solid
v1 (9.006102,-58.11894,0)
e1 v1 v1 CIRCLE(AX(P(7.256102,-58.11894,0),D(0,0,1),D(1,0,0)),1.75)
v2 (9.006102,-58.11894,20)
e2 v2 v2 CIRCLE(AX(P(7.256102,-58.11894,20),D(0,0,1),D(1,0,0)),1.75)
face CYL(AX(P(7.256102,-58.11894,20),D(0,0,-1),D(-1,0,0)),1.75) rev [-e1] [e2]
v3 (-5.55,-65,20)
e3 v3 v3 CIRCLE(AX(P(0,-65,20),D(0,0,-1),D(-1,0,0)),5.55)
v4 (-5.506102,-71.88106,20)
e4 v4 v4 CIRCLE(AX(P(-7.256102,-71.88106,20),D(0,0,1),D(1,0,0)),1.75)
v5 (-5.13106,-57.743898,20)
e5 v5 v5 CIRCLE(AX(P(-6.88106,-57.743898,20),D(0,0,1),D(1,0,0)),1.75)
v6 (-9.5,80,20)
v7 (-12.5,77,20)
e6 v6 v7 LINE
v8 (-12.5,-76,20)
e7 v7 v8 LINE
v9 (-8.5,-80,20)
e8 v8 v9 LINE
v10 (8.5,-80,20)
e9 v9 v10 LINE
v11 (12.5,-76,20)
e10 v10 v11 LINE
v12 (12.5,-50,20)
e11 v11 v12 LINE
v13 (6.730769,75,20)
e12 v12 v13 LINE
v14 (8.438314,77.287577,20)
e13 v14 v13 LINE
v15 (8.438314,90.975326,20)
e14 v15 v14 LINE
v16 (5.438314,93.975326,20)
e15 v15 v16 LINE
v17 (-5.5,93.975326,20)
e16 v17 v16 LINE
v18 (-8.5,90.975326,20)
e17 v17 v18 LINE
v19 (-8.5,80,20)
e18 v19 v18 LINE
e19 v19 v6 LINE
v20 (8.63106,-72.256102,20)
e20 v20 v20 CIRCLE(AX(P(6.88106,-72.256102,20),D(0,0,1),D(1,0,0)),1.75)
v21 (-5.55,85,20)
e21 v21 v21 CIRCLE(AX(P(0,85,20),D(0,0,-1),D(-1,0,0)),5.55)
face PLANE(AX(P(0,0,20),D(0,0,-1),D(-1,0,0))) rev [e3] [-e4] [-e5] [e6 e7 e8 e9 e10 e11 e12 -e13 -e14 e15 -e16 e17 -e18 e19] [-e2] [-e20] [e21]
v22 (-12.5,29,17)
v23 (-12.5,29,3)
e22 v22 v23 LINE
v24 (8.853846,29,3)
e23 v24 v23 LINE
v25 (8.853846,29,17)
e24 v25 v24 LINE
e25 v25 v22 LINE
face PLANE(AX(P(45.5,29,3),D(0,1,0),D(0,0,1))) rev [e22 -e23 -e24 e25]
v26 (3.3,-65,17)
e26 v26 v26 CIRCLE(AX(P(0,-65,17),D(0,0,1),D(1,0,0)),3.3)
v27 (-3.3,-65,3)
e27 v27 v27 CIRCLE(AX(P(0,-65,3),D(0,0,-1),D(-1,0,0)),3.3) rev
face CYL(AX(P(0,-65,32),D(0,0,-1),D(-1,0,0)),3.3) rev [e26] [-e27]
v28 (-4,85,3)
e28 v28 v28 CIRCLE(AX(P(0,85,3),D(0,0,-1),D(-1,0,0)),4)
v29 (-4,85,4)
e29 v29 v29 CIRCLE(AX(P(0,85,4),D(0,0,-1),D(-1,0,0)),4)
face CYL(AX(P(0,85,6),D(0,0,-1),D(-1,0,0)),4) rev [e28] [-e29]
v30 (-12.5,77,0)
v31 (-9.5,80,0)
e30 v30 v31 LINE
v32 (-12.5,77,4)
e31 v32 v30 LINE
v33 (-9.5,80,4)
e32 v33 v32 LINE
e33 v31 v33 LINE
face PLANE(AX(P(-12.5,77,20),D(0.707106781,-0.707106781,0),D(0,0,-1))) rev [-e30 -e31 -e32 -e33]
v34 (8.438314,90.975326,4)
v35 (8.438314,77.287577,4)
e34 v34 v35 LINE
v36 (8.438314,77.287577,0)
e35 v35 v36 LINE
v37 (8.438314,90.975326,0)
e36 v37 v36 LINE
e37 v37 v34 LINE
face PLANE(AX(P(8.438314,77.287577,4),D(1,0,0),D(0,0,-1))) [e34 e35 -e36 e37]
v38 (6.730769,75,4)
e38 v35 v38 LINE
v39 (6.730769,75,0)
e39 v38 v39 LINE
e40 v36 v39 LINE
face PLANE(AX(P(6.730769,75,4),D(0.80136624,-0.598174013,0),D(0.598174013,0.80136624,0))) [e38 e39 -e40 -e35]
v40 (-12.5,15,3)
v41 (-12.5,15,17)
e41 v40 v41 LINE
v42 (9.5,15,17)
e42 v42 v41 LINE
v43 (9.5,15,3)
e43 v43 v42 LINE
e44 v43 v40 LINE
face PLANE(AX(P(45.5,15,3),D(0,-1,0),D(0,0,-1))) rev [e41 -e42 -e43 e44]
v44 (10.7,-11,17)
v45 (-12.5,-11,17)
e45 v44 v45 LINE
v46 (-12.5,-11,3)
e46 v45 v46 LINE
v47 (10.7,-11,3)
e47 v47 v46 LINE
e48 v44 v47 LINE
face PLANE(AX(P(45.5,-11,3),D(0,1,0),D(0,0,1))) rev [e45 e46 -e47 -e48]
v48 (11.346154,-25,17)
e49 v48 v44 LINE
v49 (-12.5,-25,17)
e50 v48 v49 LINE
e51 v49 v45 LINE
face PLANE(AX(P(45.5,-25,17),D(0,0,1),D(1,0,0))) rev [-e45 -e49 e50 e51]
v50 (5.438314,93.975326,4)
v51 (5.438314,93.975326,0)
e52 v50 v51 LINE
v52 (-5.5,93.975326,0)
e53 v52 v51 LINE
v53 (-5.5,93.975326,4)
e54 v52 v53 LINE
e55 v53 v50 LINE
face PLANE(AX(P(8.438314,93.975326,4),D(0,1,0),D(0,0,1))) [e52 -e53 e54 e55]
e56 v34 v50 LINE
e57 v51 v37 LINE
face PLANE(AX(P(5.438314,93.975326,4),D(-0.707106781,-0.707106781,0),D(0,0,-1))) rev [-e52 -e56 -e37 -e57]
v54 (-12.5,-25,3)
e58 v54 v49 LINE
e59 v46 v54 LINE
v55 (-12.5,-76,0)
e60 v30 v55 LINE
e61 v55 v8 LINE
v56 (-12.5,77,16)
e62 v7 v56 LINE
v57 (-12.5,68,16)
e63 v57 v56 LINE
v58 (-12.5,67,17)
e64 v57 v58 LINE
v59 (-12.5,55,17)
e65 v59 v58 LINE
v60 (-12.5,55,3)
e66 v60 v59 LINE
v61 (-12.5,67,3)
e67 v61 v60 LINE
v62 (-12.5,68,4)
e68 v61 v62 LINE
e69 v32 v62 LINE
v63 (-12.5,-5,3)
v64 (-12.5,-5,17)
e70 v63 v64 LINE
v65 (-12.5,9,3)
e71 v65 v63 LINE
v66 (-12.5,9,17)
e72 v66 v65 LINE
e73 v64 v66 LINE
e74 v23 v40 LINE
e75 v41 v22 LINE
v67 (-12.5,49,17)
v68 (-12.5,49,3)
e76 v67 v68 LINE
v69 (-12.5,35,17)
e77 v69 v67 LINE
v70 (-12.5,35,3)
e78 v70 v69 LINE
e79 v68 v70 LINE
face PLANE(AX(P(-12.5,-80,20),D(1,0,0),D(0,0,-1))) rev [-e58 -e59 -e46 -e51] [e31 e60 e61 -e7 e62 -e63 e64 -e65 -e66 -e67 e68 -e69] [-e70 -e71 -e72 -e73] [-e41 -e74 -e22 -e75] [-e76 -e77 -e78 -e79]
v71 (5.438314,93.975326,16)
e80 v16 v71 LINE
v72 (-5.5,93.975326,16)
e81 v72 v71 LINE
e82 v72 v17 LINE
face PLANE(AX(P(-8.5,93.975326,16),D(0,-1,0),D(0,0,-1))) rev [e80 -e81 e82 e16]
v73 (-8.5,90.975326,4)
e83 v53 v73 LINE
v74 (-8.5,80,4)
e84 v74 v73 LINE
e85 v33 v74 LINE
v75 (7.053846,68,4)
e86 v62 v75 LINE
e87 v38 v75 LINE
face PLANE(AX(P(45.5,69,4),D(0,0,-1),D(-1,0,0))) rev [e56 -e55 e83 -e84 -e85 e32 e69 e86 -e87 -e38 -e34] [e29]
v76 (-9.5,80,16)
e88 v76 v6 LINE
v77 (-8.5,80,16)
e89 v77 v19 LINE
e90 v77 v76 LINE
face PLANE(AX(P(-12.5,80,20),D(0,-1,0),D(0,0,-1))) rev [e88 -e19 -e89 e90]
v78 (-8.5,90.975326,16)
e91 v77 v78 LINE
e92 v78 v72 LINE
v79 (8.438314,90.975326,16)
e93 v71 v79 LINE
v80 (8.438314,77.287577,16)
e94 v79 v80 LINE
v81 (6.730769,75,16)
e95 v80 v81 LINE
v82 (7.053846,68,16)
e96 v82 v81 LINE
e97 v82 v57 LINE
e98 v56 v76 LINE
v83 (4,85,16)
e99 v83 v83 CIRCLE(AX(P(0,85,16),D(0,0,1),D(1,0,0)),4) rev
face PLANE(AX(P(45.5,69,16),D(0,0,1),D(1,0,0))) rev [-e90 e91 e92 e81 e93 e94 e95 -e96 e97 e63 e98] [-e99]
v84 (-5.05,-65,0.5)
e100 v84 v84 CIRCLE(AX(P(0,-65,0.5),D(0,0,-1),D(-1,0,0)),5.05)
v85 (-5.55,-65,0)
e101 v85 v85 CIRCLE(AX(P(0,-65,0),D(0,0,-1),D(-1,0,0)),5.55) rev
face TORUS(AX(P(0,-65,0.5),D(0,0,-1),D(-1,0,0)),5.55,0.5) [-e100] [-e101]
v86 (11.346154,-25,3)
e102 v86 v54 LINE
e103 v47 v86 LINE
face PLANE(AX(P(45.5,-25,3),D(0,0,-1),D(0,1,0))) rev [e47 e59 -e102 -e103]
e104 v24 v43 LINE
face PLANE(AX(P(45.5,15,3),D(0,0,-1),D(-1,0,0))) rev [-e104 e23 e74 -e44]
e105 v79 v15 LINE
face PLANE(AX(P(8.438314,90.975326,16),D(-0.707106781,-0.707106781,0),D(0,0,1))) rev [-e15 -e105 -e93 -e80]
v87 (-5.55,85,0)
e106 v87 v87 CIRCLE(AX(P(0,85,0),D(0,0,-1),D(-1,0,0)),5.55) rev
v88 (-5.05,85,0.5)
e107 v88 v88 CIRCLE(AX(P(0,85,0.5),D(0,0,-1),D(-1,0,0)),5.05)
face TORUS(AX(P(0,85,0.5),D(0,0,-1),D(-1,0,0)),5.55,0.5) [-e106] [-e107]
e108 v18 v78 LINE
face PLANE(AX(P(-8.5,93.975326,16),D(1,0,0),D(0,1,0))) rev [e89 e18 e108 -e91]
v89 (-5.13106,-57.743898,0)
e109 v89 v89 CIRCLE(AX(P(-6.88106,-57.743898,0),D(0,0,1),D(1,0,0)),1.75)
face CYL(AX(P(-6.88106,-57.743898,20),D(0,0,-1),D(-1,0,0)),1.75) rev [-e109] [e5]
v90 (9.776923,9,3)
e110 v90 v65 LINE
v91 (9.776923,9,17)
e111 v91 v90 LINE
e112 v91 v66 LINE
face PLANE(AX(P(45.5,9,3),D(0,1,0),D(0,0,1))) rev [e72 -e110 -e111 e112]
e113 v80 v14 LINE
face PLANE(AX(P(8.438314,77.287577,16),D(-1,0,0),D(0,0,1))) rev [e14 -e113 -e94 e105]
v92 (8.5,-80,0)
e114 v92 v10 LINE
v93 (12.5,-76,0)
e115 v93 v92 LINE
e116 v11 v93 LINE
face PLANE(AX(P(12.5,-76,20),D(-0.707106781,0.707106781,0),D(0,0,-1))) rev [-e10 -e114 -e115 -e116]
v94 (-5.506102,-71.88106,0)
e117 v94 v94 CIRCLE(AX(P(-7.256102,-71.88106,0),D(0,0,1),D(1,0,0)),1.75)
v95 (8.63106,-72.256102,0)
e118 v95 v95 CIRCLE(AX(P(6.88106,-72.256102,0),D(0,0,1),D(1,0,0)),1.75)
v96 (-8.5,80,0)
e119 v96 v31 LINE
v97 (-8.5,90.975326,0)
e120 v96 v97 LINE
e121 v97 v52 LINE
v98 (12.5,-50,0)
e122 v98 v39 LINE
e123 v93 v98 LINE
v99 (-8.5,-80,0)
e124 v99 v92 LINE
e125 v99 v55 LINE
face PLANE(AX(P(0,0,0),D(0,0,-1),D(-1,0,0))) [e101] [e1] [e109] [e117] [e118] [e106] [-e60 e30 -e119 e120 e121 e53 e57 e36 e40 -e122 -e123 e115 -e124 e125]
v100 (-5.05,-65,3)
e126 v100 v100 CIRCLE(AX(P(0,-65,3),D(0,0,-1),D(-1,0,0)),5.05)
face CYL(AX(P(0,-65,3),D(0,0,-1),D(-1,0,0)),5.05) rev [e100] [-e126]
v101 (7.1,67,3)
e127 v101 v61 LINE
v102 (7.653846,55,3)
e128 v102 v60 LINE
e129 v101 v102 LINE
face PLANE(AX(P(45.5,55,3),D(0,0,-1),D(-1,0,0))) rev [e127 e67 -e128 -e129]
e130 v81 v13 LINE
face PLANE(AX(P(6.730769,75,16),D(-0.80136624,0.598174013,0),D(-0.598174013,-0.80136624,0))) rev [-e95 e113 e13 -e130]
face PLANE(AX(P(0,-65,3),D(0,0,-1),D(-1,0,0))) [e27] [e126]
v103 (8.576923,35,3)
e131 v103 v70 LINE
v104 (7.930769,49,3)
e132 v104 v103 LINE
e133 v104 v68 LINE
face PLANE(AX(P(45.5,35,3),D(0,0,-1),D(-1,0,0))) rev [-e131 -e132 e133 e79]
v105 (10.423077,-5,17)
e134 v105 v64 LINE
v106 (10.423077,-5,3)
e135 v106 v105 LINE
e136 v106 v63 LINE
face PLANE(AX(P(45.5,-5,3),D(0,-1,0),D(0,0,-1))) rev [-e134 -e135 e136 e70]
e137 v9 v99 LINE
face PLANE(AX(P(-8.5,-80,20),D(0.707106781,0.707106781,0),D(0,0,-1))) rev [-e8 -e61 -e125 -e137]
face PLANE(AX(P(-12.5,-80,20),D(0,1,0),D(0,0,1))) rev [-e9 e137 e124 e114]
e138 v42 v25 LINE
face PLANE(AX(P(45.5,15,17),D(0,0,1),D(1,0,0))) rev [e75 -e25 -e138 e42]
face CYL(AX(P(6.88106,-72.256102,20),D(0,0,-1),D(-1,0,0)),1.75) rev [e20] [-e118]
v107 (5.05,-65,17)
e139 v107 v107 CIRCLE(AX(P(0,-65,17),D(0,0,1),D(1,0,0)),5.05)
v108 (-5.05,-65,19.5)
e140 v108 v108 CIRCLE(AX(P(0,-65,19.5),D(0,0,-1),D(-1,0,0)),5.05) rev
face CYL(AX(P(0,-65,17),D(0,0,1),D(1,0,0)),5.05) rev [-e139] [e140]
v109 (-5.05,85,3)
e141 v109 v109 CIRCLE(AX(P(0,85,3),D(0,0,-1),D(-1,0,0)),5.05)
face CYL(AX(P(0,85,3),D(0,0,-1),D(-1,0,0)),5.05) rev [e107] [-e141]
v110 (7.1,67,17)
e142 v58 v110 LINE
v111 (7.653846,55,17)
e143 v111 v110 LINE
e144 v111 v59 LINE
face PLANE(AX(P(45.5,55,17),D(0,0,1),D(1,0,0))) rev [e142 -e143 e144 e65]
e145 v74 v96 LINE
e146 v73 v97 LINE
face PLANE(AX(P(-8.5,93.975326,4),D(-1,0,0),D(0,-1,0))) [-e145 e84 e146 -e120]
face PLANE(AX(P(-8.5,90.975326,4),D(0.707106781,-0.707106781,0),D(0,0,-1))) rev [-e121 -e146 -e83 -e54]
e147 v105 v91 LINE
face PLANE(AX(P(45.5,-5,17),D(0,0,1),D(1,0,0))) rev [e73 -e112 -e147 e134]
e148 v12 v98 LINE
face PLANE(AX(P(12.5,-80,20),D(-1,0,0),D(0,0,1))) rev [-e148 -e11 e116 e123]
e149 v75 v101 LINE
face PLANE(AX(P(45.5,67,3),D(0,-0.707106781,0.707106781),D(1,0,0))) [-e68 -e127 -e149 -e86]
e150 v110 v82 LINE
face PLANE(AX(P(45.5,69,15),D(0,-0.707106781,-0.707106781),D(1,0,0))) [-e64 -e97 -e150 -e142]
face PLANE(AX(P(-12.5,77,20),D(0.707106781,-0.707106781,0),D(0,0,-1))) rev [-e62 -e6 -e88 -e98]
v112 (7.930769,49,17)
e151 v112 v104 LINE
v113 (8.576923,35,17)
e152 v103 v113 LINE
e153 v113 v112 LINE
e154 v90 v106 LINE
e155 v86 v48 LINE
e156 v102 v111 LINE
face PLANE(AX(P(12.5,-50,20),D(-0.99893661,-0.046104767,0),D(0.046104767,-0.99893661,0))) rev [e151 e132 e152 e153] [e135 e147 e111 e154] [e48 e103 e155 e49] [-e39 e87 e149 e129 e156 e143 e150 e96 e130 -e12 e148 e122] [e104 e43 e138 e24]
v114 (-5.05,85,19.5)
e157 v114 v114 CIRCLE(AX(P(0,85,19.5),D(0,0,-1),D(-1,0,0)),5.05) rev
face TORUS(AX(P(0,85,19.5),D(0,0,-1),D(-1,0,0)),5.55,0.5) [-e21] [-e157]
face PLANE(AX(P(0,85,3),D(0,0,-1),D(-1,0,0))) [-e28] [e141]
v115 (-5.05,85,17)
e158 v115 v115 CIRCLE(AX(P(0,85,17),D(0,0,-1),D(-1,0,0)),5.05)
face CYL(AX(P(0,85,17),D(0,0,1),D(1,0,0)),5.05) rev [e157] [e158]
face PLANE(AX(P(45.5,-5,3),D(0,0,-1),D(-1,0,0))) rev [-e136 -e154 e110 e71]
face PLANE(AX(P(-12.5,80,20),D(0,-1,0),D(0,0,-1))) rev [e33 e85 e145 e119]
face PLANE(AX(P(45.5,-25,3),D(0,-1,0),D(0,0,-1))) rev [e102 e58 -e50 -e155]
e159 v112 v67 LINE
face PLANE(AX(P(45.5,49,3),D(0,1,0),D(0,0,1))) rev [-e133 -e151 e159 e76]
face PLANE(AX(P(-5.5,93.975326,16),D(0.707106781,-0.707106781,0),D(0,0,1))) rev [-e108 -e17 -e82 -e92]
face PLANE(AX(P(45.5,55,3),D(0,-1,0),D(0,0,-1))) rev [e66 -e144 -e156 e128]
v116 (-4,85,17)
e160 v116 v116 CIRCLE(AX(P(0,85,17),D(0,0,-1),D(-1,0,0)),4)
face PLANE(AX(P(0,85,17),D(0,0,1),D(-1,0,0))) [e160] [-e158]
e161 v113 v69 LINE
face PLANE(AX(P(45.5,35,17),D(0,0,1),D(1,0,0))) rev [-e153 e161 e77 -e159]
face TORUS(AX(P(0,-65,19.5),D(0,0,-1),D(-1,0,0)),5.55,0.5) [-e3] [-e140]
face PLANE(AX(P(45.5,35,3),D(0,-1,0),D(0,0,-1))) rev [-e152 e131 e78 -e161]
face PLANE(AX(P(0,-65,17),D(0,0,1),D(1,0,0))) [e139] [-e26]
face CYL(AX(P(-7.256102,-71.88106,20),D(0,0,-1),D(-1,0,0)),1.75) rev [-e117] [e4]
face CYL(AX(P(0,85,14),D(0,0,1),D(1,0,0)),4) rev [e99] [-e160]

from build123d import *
from OCP.BRepFilletAPI import BRepFilletAPI_MakeChamfer

# Parameters (mm, degrees)
SKETCH_1_R          = 1.75
EXTRUDE_1_DEPTH     = 20
CHAMFER_1_SIZE      = 4
SKETCH_2_R          = 5.05
CUT_EXTRUDE_1_DEPTH = 3
SKETCH_3_R          = 3.3
CUT_EXTRUDE_2_DEPTH = 32
CUT_EXTRUDE_START   = -3
SKETCH_4_R          = 5.05
CUT_EXTRUDE_3_DEPTH = 3
CHAMFER_2_SIZE      = 3
CHAMFER_2_SIZE2     = 3.148509384
SKETCH_6_W          = 14
SKETCH_6_H          = 14
CUT_EXTRUDE_4_DEPTH = 58
EXTRUDE_2_DEPTH     = 4
SKETCH_8_R          = 5.05
CUT_EXTRUDE_5_DEPTH = 3
SKETCH_9_R          = 4
CUT_EXTRUDE_6_DEPTH = 3
CHAMFER_3_SIZE      = 3
CHAMFER_4_SIZE      = 3
CHAMFER_5_SIZE      = 2
FILLET_1_R          = 0.5
FILLET_2_R          = 0.5
FILLET_3_R          = 0.5


with BuildPart() as part:
    # 草图1 → 凸台-拉伸1 (new body)
    with BuildSketch(Plane.XY):
        Polygon((12.5, -50), (6.5, 80), (-12.5, 80), (-12.5, -80), (12.5, -80), align=None)
        with Locations((-6.881060168, -57.743898363)):
            Circle(SKETCH_1_R, mode=Mode.SUBTRACT)
        with Locations((7.256101637, -58.118939832)):
            Circle(SKETCH_1_R, mode=Mode.SUBTRACT)
        with Locations((6.881060168, -72.256101637)):
            Circle(SKETCH_1_R, mode=Mode.SUBTRACT)
        with Locations((-7.256101637, -71.881060168)):
            Circle(SKETCH_1_R, mode=Mode.SUBTRACT)
    extrude(amount=EXTRUDE_1_DEPTH)

    # 倒角1
    chamfer_1_edges = [part.edges().sort_by_distance(p)[0] for p in [
        (12.5, -80, 10),
        (-12.5, -80, 10),
    ]]
    chamfer(chamfer_1_edges, length=CHAMFER_1_SIZE)

    # 草图2 → 切除-拉伸1 (cut)
    with BuildSketch(Plane.XY.offset(20)):
        with Locations((0, -65)):
            Circle(SKETCH_2_R)
    extrude(amount=-CUT_EXTRUDE_1_DEPTH, mode=Mode.SUBTRACT)

    # 草图3 → 切除-拉伸2 (cut)
    with BuildSketch(Plane(origin=(0, 0, 0), x_dir=(-1, 0, 0), z_dir=(0, 0, -1))):
        with Locations((0, -65)):
            Circle(SKETCH_3_R)
    extrude(amount=-CUT_EXTRUDE_2_DEPTH, mode=Mode.SUBTRACT)

    # 草图4 → 切除-拉伸3 (cut)
    with BuildSketch(Plane(origin=(0, 0, 0), x_dir=(-1, 0, 0), z_dir=(0, 0, -1)).offset(CUT_EXTRUDE_START)):
        with Locations(Location((0, -65, 0), (0, 0, 180))):
            Circle(SKETCH_4_R)
    extrude(amount=CUT_EXTRUDE_3_DEPTH, mode=Mode.SUBTRACT)

    # 倒角2: one chamfer whose edges measure the first distance from different faces: ONE call of the kernel's chamfer builder (chamfer() names one face for all edges)
    chamfer_2_edges_1 = [part.edges().sort_by_distance(p)[0] for p in [
        (-12.5, 80, 10),
    ]]
    chamfer_2_edges_2 = [part.edges().sort_by_distance(p)[0] for p in [
        (6.5, 80, 10),
    ]]
    chamfer_2_side_2 = [part.faces().sort_by_distance(p)[0] for p in [
        (9.5, 15, 10),
    ]]
    chamfer_2 = BRepFilletAPI_MakeChamfer(part.part.solid().wrapped)
    for e in chamfer_2_edges_1:
        chamfer_2.Add(CHAMFER_2_SIZE, e.wrapped)
    for e in chamfer_2_edges_2:
        chamfer_2.Add(CHAMFER_2_SIZE, CHAMFER_2_SIZE2, e.wrapped, chamfer_2_side_2[0].wrapped)  # the first distance lies on this face
    add(Compound.cast(chamfer_2.Shape()), mode=Mode.REPLACE)

    # 草图6 → 切除-拉伸4 (cut)
    with BuildSketch(Plane.ZY.offset(12.5)):
        Polygon((3, 69), (4, 69), (4, 86.606833076), (16, 86.606833076), (16, 69), (17, 69), (17, 55), (3, 55), align=None)
        with Locations((10, 42)):
            Rectangle(SKETCH_6_W, SKETCH_6_H)
        with Locations((10, 22)):
            Rectangle(SKETCH_6_W, SKETCH_6_H)
        with Locations((10, 2)):
            Rectangle(SKETCH_6_W, SKETCH_6_H)
        with Locations((10, -18)):
            Rectangle(SKETCH_6_W, SKETCH_6_H)
    extrude(amount=-CUT_EXTRUDE_4_DEPTH, mode=Mode.SUBTRACT)

    # 草图7 → 凸台-拉伸2 (add)
    with BuildSketch(Plane(origin=(0, 0, 0), x_dir=(-1, 0, 0), z_dir=(0, 0, -1))):
        Polygon((8.5, 93.975326294), (-4.475326294, 93.975326294), (-6.6383143, 93.975326294), (-8.4383143, 93.975326294), (-8.4383143, 77.287576761), (-6.730769231, 75), (-6.6383143, 77.00319017), (-4.475326294, 78.975326294), (-3.351490616, 80), (8.5, 80), align=None)
    extrude_2 = extrude(amount=-EXTRUDE_2_DEPTH)

    # 镜向1: 凸台-拉伸2 across plane
    add(extrude_2.mirror(Plane.XY.offset(10)))

    # 草图8 → 切除-拉伸5 (cut)
    with BuildSketch(Plane(origin=(0, 0, 0), x_dir=(-1, 0, 0), z_dir=(0, 0, -1))):
        with Locations((0, 85)):
            Circle(SKETCH_8_R)
    cut_extrude_5 = extrude(amount=-CUT_EXTRUDE_5_DEPTH, mode=Mode.SUBTRACT)

    # 草图9 → 切除-拉伸6 (cut)
    with BuildSketch(Plane(origin=(0, 0, 3), x_dir=(-1, 0, 0), z_dir=(0, 0, -1))):
        with Locations((0, 85)):
            Circle(SKETCH_9_R)
    cut_extrude_6 = extrude(amount=-CUT_EXTRUDE_6_DEPTH, mode=Mode.SUBTRACT)

    # 镜向2: 切除-拉伸5, 切除-拉伸6 across plane
    add(cut_extrude_5.mirror(Plane.XY.offset(10)), mode=Mode.SUBTRACT)
    add(cut_extrude_6.mirror(Plane.XY.offset(10)), mode=Mode.SUBTRACT)

    # 倒角3
    chamfer_3_edges = [part.edges().sort_by_distance(p)[0] for p in [
        (8.4383143, 93.975326294, 2),
        (-8.5, 93.975326294, 2),
    ]]
    chamfer(chamfer_3_edges, length=CHAMFER_3_SIZE)

    # 倒角4
    chamfer_4_edges = [part.edges().sort_by_distance(p)[0] for p in [
        (-8.5, 93.975326294, 18),
        (8.4383143, 93.975326294, 18),
    ]]
    chamfer(chamfer_4_edges, length=CHAMFER_4_SIZE)

    # 倒角5
    # the kernel refuses this chamfer: 2 mm, written as the material it adds along each edge
    with BuildSketch(Plane(origin=(-12.5, 69, 3), x_dir=(0, -0.9996219169112968, -0.0274958766105862), z_dir=(1, 0, 0))) as chamfer_5_piece_1_section:
        Polygon((CHAMFER_5_SIZE * 0.999621916911, -CHAMFER_5_SIZE * 0.0274958766106), (-CHAMFER_5_SIZE * 0.0274958766106, -CHAMFER_5_SIZE * 0.999621916911), (0, 0), align=None)
    chamfer_5_piece_1 = extrude(amount=24.651058284, mode=Mode.PRIVATE)
    chamfer_5_piece_1 = split(chamfer_5_piece_1, bisect_by=Plane(origin=(7.023262374, 68.662648572, 3.416350106), z_dir=(-0.9989366098486855, -0.04610476660840088, 0)), keep=Keep.TOP, mode=Mode.PRIVATE)
    chamfer_5_piece_1 = split(chamfer_5_piece_1, bisect_by=Plane(origin=(-2.727982872, 68.212591099, 4), z_dir=(0, 0, -1)), keep=Keep.TOP, mode=Mode.PRIVATE)
    add(chamfer_5_piece_1)
    with BuildSketch(Plane(origin=(-12.5, 69, 17), x_dir=(0, 0.02749587661058907, -0.9996219169112965), z_dir=(1, 0, 0))) as chamfer_5_piece_2_section:
        Polygon((CHAMFER_5_SIZE * 0.999621916911, -CHAMFER_5_SIZE * 0.0274958766106), (-CHAMFER_5_SIZE * 0.0274958766106, -CHAMFER_5_SIZE * 0.999621916911), (0, 0), align=None)
    chamfer_5_piece_2 = extrude(amount=24.651058284, mode=Mode.PRIVATE)
    chamfer_5_piece_2 = split(chamfer_5_piece_2, bisect_by=Plane(origin=(7.023262374, 68.662648572, 16.583649894), z_dir=(-0.9989366098486855, -0.04610476660840088, 0)), keep=Keep.TOP, mode=Mode.PRIVATE)
    chamfer_5_piece_2 = split(chamfer_5_piece_2, bisect_by=Plane(origin=(-2.727982872, 68.212591099, 16), z_dir=(0, 0, 1)), keep=Keep.TOP, mode=Mode.PRIVATE)
    add(chamfer_5_piece_2)

    # 圆角1
    fillet_1_edges = [part.edges().sort_by_distance(p)[0] for p in [
        (-5.05, -65, 0),
    ]]
    fillet(fillet_1_edges, radius=FILLET_1_R)

    # 圆角2
    fillet_2_edges = [part.edges().sort_by_distance(p)[0] for p in [
        (-5.05, -65, 20),
    ]]
    fillet(fillet_2_edges, radius=FILLET_2_R)

    # 圆角3
    fillet_3_edges = [part.edges().sort_by_distance(p)[0] for p in [
        (5.05, 85, 0),
        (5.05, 85, 20),
    ]]
    fillet(fillet_3_edges, radius=FILLET_3_R)


solid = part.part
